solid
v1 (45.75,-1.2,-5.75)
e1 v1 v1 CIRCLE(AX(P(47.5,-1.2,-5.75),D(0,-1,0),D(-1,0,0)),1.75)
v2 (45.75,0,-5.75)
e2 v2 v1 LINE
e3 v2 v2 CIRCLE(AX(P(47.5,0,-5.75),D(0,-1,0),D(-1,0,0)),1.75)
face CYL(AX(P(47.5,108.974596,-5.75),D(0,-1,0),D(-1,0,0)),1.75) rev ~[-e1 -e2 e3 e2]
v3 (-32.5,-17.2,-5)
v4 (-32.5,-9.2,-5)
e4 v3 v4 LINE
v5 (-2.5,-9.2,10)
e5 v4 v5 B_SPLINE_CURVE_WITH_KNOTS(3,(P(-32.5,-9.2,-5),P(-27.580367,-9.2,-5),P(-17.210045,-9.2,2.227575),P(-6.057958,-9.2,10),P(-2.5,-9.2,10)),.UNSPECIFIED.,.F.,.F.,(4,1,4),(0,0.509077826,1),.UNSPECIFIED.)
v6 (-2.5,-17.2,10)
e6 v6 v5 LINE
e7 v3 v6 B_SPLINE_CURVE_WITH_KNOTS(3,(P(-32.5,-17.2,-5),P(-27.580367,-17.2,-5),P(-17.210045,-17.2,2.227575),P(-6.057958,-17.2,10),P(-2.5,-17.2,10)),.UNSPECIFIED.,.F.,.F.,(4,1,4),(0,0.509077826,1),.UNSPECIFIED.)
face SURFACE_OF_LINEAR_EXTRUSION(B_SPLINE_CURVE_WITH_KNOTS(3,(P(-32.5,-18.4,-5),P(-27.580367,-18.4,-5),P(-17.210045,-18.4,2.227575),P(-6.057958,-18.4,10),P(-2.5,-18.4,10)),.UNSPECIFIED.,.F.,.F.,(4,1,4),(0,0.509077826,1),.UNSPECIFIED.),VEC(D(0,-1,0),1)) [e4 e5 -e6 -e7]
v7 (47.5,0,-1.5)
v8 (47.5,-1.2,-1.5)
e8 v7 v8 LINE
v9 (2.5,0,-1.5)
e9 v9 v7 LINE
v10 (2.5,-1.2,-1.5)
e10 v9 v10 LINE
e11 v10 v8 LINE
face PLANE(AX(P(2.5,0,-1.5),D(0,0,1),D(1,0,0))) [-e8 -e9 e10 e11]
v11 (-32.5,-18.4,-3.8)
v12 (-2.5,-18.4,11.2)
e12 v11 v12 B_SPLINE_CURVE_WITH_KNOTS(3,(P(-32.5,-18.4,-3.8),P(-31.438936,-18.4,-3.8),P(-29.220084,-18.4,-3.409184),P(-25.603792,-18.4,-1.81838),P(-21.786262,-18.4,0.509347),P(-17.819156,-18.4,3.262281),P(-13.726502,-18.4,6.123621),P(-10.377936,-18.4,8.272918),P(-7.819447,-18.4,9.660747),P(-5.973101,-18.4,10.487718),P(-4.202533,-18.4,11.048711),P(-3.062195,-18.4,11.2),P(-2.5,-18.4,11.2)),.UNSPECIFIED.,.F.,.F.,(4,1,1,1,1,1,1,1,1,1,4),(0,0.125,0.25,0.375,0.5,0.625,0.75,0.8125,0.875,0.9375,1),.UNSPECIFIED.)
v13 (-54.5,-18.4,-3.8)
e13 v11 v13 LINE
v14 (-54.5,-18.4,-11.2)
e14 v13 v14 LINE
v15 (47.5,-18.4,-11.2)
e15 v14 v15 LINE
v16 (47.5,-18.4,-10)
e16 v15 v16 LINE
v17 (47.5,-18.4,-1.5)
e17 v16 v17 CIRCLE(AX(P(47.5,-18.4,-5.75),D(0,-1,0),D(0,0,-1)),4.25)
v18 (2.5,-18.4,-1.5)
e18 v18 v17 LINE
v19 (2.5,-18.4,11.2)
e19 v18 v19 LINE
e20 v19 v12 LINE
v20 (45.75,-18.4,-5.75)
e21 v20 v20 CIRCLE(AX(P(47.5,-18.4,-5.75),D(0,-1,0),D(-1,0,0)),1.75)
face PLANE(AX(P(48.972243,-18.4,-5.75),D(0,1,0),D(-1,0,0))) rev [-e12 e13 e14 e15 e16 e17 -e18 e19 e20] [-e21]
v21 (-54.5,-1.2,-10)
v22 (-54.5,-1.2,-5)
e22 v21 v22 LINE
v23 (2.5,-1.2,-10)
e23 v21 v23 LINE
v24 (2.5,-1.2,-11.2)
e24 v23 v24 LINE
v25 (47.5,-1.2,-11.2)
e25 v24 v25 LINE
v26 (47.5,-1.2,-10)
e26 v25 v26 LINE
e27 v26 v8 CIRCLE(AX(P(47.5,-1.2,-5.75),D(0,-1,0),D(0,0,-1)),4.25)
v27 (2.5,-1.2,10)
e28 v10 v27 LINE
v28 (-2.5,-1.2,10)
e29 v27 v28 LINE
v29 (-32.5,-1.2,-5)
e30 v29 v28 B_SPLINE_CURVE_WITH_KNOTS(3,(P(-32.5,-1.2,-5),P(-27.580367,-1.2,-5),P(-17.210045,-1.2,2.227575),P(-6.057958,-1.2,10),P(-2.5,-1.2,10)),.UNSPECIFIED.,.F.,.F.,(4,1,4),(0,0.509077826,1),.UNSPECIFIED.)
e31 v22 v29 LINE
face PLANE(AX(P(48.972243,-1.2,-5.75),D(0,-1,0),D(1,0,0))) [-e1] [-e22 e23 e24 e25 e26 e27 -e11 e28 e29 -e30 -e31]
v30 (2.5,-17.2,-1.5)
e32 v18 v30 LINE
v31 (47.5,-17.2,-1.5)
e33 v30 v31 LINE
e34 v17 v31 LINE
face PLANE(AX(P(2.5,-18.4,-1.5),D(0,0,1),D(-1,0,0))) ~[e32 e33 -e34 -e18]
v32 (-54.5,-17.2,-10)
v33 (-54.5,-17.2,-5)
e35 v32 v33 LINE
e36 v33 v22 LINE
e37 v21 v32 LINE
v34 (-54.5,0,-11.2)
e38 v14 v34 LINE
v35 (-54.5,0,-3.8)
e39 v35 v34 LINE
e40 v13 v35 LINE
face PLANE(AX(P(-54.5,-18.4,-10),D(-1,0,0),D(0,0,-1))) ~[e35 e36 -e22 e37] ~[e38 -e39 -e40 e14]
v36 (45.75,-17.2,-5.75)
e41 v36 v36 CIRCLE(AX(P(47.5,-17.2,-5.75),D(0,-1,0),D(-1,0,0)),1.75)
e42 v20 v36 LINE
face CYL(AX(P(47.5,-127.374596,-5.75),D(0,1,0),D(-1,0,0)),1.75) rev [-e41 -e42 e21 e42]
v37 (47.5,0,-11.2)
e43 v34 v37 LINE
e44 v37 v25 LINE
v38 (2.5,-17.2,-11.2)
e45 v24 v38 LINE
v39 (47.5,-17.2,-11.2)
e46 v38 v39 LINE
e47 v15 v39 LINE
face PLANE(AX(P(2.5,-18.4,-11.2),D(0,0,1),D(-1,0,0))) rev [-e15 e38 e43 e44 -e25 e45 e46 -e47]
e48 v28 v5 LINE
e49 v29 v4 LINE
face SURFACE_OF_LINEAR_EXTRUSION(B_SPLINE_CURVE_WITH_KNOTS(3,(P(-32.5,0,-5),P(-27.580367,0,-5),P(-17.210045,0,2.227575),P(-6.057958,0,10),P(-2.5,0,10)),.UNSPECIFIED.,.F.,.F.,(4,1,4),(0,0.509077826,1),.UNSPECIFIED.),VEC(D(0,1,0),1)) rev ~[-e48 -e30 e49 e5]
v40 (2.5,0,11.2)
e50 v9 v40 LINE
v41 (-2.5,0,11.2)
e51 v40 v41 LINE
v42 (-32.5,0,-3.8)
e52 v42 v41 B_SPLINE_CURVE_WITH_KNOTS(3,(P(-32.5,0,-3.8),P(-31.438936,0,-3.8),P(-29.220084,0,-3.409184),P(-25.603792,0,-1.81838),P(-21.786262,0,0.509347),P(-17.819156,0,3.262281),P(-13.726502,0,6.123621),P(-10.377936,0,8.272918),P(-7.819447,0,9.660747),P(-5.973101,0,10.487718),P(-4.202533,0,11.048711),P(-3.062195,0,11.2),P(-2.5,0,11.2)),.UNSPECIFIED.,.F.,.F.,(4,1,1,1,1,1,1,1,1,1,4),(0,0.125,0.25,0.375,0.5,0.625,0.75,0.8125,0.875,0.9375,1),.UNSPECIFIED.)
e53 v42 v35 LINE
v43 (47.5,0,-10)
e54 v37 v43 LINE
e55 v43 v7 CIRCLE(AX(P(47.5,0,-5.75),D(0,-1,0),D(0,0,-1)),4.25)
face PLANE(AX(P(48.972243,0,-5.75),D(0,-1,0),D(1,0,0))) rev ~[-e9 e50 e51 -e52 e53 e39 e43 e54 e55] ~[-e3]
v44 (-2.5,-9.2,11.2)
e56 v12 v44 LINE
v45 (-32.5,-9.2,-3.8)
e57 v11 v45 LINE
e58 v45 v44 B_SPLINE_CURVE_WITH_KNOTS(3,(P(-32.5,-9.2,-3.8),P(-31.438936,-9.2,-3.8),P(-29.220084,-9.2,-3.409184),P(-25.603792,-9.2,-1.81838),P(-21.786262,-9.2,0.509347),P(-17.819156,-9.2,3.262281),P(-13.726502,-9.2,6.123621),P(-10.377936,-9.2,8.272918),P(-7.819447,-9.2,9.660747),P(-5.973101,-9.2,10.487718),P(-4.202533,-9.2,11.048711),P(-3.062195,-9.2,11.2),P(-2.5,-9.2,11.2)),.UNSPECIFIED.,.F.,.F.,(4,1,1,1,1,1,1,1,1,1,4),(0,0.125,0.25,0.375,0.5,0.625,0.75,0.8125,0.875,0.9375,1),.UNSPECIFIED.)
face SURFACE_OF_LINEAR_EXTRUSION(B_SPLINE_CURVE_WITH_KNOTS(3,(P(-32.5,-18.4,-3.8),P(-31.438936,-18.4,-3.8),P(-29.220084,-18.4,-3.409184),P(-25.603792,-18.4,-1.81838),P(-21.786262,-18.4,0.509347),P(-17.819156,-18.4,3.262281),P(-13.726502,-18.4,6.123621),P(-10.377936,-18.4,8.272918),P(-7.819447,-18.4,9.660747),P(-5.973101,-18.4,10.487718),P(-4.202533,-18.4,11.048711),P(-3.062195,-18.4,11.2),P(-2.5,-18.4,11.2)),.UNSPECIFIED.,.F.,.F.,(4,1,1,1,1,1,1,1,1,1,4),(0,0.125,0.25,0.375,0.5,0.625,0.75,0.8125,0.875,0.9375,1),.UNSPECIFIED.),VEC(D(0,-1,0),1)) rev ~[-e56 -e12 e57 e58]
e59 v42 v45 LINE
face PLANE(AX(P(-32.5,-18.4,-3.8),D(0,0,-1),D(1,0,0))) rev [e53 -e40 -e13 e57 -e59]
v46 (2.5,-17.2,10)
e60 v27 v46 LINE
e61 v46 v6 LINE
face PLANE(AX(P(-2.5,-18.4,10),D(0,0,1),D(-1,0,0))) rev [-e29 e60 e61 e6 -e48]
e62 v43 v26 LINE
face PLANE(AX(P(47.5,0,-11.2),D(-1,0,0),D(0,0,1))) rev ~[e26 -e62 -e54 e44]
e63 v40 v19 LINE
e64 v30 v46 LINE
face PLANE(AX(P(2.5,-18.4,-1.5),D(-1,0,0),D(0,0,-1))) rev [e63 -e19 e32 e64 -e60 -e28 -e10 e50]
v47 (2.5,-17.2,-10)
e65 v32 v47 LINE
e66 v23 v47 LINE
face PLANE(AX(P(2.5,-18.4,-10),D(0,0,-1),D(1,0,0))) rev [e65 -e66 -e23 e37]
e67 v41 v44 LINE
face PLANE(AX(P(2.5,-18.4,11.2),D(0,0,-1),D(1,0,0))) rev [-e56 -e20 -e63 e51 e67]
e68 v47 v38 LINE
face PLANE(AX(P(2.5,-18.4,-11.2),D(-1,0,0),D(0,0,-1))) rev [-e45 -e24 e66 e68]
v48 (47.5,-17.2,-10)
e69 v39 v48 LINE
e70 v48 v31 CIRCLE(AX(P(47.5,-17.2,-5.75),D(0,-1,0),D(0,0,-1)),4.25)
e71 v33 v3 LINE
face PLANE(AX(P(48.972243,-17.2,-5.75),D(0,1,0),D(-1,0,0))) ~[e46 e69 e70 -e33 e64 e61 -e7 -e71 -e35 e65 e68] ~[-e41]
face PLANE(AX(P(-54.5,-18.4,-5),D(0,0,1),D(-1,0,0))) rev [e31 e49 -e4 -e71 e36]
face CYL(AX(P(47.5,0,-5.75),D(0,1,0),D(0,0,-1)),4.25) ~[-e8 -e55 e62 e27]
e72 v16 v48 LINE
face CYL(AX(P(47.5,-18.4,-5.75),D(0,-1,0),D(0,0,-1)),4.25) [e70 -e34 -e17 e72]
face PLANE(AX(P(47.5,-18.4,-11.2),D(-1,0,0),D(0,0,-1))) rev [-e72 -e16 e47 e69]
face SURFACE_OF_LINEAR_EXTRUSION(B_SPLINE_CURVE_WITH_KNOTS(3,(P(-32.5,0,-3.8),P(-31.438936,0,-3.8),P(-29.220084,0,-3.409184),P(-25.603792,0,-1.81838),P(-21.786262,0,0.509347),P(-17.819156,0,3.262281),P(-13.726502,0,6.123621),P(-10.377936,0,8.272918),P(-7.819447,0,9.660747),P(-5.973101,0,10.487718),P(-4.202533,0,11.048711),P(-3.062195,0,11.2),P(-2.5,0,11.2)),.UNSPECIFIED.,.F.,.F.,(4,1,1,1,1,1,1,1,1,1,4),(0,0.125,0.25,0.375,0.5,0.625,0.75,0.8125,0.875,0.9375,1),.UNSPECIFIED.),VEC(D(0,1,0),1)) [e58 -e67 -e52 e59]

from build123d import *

# Parameters (mm, degrees)
F0_W     = 45
F0_H     = 8.5
F0_H_2   = 1.2
F0_W_2   = 22
F0_H_3   = 5
F1_DEPTH = 1.2
F2_DEPTH = 9.2
F3_D     = 3.5


# Not quite as in the source:
# - the dataset's text gives a spline's control points without its knots; the knots are read off the source's solid


with BuildPart() as f1:
    # F0 (on Front) → F1 (new body)
    with BuildSketch(Plane.XZ):
        with BuildLine():
            Line((47.5, -1.5), (47.5, -10))
            ThreePointArc((47.5, -10), (51.75, -5.75), (47.5, -1.5))
        make_face()
        with Locations((25, -5.75)):
            Rectangle(F0_W, F0_H)
        with Locations((25, -10.6)):
            Rectangle(F0_W, F0_H_2)
        with BuildLine():
            Line((-32.5, -10), (-2.5, -10))
            Line((-2.5, -10), (-2.5, 10))
            add(Edge.make_bspline(
                [(-32.5, -5), (-27.5803674012, -5), (-17.2100449751, 2.2275754238), (-6.0579581186, 10), (-2.5, 10)],
                knots=[0, 0, 0, 0, 0.5090778259, 1, 1, 1, 1], degree=3))
            Line((-32.5, -5), (-32.5, -10))
        make_face()
        Polygon((-2.5, -10), (2.5, -10), (2.5, -1.5), (2.5, 10), (-2.5, 10), align=None)
        with Locations((-43.5, -7.5)):
            Rectangle(F0_W_2, F0_H_3)
    extrude(amount=F1_DEPTH)

    # F0 (on Front) → F2 (join)
    with BuildSketch(Plane.XZ):
        with BuildLine():
            add(Edge.make_bspline(
                [(-32.5, -5), (-27.5803674012, -5), (-17.2100449751, 2.2275754238), (-6.0579581186, 10), (-2.5, 10)],
                knots=[0, 0, 0, 0, 0.5090778259, 1, 1, 1, 1], degree=3))
            Line((-2.5, 10), (2.5, 10))
            Line((2.5, 10), (2.5, 11.2))
            Line((2.5, 11.2), (-2.5, 11.2))
            add(Edge.make_bspline(
                [(-32.5, -3.8), (-31.4389363622, -3.8), (-29.2200835852, -3.4091842374), (-25.6037921172, -1.8183804645), (-21.7862624056, 0.5093473763), (-17.819156486, 3.2622809958), (-13.7265020427, 6.1236212623), (-10.3779360475, 8.2729183736), (-7.8194468713, 9.6607467479), (-5.973100675, 10.4877178879), (-4.2025331466, 11.0487112992), (-3.0621946213, 11.2), (-2.5, 11.2)],
                knots=[0, 0, 0, 0, 0.125, 0.25, 0.375, 0.5, 0.625, 0.75, 0.8125, 0.875, 0.9375, 1, 1, 1, 1], degree=3))
            Line((-32.5, -3.8), (-54.5, -3.8))
            Line((-54.5, -3.8), (-54.5, -5))
            Line((-54.5, -5), (-32.5, -5))
        make_face()
        Polygon((2.5, -11.2), (2.5, -10), (-2.5, -10), (-32.5, -10), (-54.5, -10), (-54.5, -11.2), (-32.8350449828, -11.2), (-2.8350449828, -11.2), align=None)
    extrude(amount=F2_DEPTH)

    # F3 (through all)
    with Locations(Plane(origin=(0, 0, 0), x_dir=(1, 0, 0), z_dir=(0, 1, 0))):
        with Locations((47.5, 5.75)):
            Hole(F3_D / 2)

    # F4: F1 across face


with BuildPart() as f1_1:
    add(f1.part)
    add(f1.part.mirror(Plane(origin=(-26, -9.2, -10.6), x_dir=(1, 0, 0), z_dir=(0, -1, 0))))


solid = f1_1.part
